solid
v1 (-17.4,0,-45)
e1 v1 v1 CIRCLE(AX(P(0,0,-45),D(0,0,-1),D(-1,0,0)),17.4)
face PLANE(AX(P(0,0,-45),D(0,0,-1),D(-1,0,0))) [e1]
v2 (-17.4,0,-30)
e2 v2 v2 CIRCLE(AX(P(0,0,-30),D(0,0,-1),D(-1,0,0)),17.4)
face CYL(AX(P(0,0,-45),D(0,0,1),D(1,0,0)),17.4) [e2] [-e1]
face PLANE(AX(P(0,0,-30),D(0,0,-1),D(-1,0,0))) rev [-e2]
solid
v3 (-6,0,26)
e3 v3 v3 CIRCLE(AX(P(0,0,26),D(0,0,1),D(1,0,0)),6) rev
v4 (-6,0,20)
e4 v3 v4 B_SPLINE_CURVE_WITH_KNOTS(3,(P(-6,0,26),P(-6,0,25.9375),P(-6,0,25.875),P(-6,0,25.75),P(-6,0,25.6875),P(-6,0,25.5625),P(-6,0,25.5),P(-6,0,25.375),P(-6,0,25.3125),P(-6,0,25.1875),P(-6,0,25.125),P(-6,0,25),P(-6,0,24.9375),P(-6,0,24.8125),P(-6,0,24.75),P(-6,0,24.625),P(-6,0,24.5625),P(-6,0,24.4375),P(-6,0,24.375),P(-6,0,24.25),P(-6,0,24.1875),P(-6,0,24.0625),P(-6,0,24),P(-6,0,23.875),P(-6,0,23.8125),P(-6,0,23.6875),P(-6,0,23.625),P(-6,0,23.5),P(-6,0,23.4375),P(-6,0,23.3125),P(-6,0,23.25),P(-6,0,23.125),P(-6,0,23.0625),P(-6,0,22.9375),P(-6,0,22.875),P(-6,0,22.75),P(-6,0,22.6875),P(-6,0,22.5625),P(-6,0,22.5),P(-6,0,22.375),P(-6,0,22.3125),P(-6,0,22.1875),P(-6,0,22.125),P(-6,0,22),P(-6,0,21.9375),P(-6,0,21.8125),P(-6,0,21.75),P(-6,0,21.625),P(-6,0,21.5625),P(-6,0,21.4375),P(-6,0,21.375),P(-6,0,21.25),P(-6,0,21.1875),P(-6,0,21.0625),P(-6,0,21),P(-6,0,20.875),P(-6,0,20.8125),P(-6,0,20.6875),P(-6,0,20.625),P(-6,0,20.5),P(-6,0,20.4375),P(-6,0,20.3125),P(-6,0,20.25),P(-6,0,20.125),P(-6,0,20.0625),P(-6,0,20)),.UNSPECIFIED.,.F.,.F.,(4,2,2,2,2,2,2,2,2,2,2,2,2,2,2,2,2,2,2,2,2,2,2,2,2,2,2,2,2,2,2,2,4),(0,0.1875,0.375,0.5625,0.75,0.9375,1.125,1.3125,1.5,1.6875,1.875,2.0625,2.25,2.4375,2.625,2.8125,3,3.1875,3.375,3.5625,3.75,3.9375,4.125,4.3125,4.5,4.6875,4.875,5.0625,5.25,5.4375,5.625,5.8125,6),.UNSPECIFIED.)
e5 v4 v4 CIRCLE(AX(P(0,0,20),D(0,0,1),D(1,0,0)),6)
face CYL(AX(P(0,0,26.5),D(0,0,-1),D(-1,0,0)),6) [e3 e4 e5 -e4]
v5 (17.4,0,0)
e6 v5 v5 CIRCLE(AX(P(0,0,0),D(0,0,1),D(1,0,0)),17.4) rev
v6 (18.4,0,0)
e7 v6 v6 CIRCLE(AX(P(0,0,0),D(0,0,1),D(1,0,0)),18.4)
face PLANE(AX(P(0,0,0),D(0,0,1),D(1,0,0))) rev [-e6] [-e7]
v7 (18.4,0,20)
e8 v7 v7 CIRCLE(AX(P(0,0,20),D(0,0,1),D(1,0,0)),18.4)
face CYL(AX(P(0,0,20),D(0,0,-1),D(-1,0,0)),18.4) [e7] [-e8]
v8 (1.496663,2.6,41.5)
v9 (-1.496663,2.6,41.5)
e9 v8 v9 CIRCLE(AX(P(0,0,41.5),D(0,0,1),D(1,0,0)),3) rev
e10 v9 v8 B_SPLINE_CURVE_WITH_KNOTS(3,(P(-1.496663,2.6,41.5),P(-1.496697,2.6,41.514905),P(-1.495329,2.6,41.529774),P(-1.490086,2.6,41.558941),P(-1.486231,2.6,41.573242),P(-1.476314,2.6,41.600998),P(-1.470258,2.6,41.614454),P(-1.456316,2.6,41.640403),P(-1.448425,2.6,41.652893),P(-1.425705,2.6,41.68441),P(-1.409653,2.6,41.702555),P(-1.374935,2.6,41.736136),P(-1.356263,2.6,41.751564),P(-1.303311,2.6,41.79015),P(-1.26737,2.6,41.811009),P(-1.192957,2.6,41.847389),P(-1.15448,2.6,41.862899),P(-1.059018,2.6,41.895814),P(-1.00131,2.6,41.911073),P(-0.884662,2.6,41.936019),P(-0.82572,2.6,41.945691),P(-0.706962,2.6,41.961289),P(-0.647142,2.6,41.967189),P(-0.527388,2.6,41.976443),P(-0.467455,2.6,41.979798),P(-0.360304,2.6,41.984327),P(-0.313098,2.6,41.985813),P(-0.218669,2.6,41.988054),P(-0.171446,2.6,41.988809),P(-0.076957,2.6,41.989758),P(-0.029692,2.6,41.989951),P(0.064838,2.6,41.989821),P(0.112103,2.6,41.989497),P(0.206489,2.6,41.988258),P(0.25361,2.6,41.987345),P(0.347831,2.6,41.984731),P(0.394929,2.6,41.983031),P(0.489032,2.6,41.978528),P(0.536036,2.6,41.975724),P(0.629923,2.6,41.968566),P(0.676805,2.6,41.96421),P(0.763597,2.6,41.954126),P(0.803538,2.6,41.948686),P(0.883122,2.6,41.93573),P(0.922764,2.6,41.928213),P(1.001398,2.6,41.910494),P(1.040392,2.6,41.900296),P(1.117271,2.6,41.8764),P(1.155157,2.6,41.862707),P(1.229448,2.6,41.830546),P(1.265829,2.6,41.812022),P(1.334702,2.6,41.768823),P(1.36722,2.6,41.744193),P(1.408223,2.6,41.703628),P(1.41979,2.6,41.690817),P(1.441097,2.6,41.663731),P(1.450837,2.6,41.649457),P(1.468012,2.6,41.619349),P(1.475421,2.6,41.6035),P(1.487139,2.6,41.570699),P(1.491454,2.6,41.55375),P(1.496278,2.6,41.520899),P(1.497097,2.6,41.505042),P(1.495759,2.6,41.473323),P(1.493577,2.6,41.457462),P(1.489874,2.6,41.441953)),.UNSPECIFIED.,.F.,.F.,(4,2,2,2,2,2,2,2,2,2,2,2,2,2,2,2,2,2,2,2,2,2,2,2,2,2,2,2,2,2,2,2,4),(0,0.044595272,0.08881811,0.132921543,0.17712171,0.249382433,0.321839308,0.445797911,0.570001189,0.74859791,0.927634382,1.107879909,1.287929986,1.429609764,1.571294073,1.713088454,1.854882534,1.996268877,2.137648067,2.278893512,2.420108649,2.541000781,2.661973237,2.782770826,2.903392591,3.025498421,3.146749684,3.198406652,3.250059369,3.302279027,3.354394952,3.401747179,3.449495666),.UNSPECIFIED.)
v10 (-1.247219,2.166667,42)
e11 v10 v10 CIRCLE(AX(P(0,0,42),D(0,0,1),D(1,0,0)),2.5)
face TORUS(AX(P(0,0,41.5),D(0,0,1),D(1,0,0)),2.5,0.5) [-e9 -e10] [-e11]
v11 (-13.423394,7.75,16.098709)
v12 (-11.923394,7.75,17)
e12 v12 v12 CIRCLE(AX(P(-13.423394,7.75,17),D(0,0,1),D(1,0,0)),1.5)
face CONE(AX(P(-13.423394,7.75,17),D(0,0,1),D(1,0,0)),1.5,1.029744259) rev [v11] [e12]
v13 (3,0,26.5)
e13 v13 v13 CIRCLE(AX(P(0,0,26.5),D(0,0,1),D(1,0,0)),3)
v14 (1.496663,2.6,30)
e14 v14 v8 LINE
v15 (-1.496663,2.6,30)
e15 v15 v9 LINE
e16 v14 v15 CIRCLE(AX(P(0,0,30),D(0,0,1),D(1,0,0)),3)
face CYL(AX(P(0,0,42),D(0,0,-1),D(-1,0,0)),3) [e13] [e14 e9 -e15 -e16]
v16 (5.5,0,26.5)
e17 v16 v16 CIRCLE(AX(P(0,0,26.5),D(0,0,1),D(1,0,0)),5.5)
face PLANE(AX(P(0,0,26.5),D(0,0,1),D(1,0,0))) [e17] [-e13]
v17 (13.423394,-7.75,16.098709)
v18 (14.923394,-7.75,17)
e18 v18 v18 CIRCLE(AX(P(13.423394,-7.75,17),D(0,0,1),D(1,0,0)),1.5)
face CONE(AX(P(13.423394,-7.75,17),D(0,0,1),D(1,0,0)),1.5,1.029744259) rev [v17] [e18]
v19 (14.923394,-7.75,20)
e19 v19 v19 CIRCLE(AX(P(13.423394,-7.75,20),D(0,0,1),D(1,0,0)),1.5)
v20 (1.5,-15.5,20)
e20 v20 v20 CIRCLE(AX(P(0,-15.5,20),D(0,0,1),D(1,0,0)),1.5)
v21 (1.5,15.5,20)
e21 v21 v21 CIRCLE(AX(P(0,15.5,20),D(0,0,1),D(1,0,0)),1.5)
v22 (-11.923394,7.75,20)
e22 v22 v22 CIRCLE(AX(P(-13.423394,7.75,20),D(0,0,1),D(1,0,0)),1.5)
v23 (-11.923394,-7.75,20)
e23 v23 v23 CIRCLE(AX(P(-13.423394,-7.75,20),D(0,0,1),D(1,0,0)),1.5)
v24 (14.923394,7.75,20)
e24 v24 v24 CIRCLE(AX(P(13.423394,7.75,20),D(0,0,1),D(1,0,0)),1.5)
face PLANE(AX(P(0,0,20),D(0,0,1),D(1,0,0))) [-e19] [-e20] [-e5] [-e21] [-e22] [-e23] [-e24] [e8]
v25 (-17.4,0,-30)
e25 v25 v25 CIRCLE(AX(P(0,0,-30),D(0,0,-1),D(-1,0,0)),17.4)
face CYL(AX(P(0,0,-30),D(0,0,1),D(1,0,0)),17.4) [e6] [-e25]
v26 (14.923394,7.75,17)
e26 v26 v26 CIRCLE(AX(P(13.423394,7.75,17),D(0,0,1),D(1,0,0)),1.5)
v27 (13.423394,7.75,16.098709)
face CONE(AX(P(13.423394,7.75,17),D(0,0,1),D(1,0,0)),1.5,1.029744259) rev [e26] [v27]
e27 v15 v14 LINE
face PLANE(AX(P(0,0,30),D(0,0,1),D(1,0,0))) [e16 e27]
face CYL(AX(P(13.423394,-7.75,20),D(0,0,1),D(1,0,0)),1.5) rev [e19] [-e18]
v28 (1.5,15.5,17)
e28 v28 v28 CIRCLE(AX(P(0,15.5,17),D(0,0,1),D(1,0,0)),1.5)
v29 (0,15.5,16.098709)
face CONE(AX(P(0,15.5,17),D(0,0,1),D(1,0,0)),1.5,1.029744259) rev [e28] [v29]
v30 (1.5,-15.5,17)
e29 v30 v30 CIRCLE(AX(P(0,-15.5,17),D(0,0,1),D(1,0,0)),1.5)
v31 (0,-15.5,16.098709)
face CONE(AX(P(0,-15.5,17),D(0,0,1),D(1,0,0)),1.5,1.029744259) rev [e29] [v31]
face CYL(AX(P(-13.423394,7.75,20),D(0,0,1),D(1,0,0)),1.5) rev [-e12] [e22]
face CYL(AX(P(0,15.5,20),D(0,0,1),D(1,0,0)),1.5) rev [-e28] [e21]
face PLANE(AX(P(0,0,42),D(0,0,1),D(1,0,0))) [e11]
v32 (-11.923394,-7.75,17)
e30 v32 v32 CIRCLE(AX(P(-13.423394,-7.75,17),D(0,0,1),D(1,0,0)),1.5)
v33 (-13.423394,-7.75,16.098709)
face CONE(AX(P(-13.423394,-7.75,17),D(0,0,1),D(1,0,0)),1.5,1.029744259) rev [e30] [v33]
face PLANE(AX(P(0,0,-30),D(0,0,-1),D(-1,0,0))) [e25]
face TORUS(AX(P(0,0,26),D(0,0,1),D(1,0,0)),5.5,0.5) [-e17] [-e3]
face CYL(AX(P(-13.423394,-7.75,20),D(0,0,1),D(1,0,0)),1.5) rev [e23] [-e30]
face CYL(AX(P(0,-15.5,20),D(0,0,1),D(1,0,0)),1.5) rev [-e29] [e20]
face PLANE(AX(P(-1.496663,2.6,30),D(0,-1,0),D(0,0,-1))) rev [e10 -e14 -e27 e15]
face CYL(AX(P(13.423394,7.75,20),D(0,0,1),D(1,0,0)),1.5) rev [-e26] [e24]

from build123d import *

# Parameters (mm, degrees)
SKETCH1_R                    = 18.4
BOSS_EXTRUDE1_DEPTH          = 20
SKETCH2_R                    = 17.4
BOSS_EXTRUDE2_DEPTH          = 30
SKETCH3_R                    = 6
BOSS_EXTRUDE3_DEPTH          = 6.5
FILLET1_R                    = 0.5
SKETCH4_R                    = 3
BOSS_EXTRUDE4_DEPTH          = 15.5
CUT_EXTRUDE1_START           = -12
CUT_EXTRUDE1_DEPTH           = 12
F_3_0_3_DIAMETER_HOLE1_D     = 3
F_3_0_3_DIAMETER_HOLE1_DEPTH = 3
F_3_0_3_DIAMETER_HOLE1_TIP   = 0.901290929
FILLET4_R                    = 0.5
CROQUIS1_R                   = 17.4
SALIENTE_EXTRUIR3_DEPTH      = 15


with BuildPart() as part:
    # Sketch1 → Boss-Extrude1 (new body)
    with BuildSketch(Plane.XY):
        Circle(SKETCH1_R)
    extrude(amount=BOSS_EXTRUDE1_DEPTH)

    # Sketch2 → Boss-Extrude2 (add)
    with BuildSketch(Plane(origin=(0, 0, 0), x_dir=(-1, 0, 0), z_dir=(0, 0, -1))):
        with Locations(Location((0, 0, 0), (0, 0, 180))):
            Circle(SKETCH2_R)
    extrude(amount=BOSS_EXTRUDE2_DEPTH)

    # Sketch3 → Boss-Extrude3 (add)
    with BuildSketch(Plane.XY.offset(20)):
        with Locations(Location((0, 0, 0), (0, 0, 180))):
            Circle(SKETCH3_R)
    extrude(amount=BOSS_EXTRUDE3_DEPTH)

    # Fillet1
    fillet1_edges = [part.edges().sort_by_distance(p)[0] for p in [
        (6, 0, 26.5),
    ]]
    fillet(fillet1_edges, radius=FILLET1_R)

    # Sketch4 → Boss-Extrude4 (add)
    with BuildSketch(Plane.XY.offset(26.5)):
        Circle(SKETCH4_R)
    extrude(amount=BOSS_EXTRUDE4_DEPTH)

    # Sketch5 → Cut-Extrude1 (cut)
    with BuildSketch(Plane.XY.offset(42).offset(CUT_EXTRUDE1_START)):
        with BuildLine():
            Line((-1.496662955, 2.6), (1.496662955, 2.6))
            ThreePointArc((1.496662955, 2.6), (0, 3), (-1.496662955, 2.6))
        make_face()
    extrude(amount=CUT_EXTRUDE1_DEPTH, mode=Mode.SUBTRACT)

    # Ø3.0 (3) Diameter Hole1
    with Locations(Plane.XY.offset(20)):
        with Locations((-13.423393759, 7.75), (-13.423393759, -7.75), (0, -15.5), (13.423393759, 7.75), (0, 15.5), (13.423393759, -7.75)):
            Hole(F_3_0_3_DIAMETER_HOLE1_D / 2, depth=F_3_0_3_DIAMETER_HOLE1_DEPTH)
            with Locations((0, 0, -(F_3_0_3_DIAMETER_HOLE1_DEPTH + F_3_0_3_DIAMETER_HOLE1_TIP / 2))):  # 118° drill point
                Cone(0, F_3_0_3_DIAMETER_HOLE1_D / 2, F_3_0_3_DIAMETER_HOLE1_TIP, mode=Mode.SUBTRACT)

    # Fillet4
    # the kernel refuses this fillet: 0.5 mm, written as the material it takes off along each edge
    with BuildSketch(Plane(origin=(0, 0, 42), x_dir=(0.46226557285945985, 0.8867415295050273, 0), z_dir=(0.8867415295050273, -0.46226557285945985, 0))) as fillet4_piece_1:
        with BuildLine():
            CenterArc((3 - FILLET4_R, -FILLET4_R), FILLET4_R, 0, 90)
            Line((3 - FILLET4_R, 0), (3 - FILLET4_R, FILLET4_R * 0.02))
            Line((3 - FILLET4_R, FILLET4_R * 0.02), (3 + FILLET4_R * 0.02, FILLET4_R * 0.02))
            Line((3 + FILLET4_R * 0.02, FILLET4_R * 0.02), (3 + FILLET4_R * 0.02, -FILLET4_R))
            Line((3 + FILLET4_R * 0.02, -FILLET4_R), (3, -FILLET4_R))
        make_face()
    revolve(axis=Axis((0, 0, 42), (0, 0, 1)), revolution_arc=297.533397677, mode=Mode.SUBTRACT)
    with BuildSketch(Plane(origin=(0, 0, 42), x_dir=(1, 0, 0), z_dir=(0, -1, 0))) as fillet4_piece_2:
        with BuildLine():
            CenterArc((3 - FILLET4_R, -FILLET4_R), FILLET4_R, 0, 90)
            Line((3 - FILLET4_R, 0), (3 - FILLET4_R, FILLET4_R * 0.02))
            Line((3 - FILLET4_R, FILLET4_R * 0.02), (3 + FILLET4_R * 0.02, FILLET4_R * 0.02))
            Line((3 + FILLET4_R * 0.02, FILLET4_R * 0.02), (3 + FILLET4_R * 0.02, -FILLET4_R))
            Line((3 + FILLET4_R * 0.02, -FILLET4_R), (3, -FILLET4_R))
        make_face()
    revolve(axis=Axis((0, 0, 42), (0, 0, 1)), revolution_arc=117.379597562, mode=Mode.SUBTRACT)


with BuildPart() as body_2:
    # Croquis1 → Saliente-Extruir3 (new body)
    with BuildSketch(Plane(origin=(0, 0, -30), x_dir=(-1, 0, 0), z_dir=(0, 0, -1))):
        Circle(CROQUIS1_R)
    extrude(amount=SALIENTE_EXTRUIR3_DEPTH)


solid = Compound([part.part, body_2.part])
